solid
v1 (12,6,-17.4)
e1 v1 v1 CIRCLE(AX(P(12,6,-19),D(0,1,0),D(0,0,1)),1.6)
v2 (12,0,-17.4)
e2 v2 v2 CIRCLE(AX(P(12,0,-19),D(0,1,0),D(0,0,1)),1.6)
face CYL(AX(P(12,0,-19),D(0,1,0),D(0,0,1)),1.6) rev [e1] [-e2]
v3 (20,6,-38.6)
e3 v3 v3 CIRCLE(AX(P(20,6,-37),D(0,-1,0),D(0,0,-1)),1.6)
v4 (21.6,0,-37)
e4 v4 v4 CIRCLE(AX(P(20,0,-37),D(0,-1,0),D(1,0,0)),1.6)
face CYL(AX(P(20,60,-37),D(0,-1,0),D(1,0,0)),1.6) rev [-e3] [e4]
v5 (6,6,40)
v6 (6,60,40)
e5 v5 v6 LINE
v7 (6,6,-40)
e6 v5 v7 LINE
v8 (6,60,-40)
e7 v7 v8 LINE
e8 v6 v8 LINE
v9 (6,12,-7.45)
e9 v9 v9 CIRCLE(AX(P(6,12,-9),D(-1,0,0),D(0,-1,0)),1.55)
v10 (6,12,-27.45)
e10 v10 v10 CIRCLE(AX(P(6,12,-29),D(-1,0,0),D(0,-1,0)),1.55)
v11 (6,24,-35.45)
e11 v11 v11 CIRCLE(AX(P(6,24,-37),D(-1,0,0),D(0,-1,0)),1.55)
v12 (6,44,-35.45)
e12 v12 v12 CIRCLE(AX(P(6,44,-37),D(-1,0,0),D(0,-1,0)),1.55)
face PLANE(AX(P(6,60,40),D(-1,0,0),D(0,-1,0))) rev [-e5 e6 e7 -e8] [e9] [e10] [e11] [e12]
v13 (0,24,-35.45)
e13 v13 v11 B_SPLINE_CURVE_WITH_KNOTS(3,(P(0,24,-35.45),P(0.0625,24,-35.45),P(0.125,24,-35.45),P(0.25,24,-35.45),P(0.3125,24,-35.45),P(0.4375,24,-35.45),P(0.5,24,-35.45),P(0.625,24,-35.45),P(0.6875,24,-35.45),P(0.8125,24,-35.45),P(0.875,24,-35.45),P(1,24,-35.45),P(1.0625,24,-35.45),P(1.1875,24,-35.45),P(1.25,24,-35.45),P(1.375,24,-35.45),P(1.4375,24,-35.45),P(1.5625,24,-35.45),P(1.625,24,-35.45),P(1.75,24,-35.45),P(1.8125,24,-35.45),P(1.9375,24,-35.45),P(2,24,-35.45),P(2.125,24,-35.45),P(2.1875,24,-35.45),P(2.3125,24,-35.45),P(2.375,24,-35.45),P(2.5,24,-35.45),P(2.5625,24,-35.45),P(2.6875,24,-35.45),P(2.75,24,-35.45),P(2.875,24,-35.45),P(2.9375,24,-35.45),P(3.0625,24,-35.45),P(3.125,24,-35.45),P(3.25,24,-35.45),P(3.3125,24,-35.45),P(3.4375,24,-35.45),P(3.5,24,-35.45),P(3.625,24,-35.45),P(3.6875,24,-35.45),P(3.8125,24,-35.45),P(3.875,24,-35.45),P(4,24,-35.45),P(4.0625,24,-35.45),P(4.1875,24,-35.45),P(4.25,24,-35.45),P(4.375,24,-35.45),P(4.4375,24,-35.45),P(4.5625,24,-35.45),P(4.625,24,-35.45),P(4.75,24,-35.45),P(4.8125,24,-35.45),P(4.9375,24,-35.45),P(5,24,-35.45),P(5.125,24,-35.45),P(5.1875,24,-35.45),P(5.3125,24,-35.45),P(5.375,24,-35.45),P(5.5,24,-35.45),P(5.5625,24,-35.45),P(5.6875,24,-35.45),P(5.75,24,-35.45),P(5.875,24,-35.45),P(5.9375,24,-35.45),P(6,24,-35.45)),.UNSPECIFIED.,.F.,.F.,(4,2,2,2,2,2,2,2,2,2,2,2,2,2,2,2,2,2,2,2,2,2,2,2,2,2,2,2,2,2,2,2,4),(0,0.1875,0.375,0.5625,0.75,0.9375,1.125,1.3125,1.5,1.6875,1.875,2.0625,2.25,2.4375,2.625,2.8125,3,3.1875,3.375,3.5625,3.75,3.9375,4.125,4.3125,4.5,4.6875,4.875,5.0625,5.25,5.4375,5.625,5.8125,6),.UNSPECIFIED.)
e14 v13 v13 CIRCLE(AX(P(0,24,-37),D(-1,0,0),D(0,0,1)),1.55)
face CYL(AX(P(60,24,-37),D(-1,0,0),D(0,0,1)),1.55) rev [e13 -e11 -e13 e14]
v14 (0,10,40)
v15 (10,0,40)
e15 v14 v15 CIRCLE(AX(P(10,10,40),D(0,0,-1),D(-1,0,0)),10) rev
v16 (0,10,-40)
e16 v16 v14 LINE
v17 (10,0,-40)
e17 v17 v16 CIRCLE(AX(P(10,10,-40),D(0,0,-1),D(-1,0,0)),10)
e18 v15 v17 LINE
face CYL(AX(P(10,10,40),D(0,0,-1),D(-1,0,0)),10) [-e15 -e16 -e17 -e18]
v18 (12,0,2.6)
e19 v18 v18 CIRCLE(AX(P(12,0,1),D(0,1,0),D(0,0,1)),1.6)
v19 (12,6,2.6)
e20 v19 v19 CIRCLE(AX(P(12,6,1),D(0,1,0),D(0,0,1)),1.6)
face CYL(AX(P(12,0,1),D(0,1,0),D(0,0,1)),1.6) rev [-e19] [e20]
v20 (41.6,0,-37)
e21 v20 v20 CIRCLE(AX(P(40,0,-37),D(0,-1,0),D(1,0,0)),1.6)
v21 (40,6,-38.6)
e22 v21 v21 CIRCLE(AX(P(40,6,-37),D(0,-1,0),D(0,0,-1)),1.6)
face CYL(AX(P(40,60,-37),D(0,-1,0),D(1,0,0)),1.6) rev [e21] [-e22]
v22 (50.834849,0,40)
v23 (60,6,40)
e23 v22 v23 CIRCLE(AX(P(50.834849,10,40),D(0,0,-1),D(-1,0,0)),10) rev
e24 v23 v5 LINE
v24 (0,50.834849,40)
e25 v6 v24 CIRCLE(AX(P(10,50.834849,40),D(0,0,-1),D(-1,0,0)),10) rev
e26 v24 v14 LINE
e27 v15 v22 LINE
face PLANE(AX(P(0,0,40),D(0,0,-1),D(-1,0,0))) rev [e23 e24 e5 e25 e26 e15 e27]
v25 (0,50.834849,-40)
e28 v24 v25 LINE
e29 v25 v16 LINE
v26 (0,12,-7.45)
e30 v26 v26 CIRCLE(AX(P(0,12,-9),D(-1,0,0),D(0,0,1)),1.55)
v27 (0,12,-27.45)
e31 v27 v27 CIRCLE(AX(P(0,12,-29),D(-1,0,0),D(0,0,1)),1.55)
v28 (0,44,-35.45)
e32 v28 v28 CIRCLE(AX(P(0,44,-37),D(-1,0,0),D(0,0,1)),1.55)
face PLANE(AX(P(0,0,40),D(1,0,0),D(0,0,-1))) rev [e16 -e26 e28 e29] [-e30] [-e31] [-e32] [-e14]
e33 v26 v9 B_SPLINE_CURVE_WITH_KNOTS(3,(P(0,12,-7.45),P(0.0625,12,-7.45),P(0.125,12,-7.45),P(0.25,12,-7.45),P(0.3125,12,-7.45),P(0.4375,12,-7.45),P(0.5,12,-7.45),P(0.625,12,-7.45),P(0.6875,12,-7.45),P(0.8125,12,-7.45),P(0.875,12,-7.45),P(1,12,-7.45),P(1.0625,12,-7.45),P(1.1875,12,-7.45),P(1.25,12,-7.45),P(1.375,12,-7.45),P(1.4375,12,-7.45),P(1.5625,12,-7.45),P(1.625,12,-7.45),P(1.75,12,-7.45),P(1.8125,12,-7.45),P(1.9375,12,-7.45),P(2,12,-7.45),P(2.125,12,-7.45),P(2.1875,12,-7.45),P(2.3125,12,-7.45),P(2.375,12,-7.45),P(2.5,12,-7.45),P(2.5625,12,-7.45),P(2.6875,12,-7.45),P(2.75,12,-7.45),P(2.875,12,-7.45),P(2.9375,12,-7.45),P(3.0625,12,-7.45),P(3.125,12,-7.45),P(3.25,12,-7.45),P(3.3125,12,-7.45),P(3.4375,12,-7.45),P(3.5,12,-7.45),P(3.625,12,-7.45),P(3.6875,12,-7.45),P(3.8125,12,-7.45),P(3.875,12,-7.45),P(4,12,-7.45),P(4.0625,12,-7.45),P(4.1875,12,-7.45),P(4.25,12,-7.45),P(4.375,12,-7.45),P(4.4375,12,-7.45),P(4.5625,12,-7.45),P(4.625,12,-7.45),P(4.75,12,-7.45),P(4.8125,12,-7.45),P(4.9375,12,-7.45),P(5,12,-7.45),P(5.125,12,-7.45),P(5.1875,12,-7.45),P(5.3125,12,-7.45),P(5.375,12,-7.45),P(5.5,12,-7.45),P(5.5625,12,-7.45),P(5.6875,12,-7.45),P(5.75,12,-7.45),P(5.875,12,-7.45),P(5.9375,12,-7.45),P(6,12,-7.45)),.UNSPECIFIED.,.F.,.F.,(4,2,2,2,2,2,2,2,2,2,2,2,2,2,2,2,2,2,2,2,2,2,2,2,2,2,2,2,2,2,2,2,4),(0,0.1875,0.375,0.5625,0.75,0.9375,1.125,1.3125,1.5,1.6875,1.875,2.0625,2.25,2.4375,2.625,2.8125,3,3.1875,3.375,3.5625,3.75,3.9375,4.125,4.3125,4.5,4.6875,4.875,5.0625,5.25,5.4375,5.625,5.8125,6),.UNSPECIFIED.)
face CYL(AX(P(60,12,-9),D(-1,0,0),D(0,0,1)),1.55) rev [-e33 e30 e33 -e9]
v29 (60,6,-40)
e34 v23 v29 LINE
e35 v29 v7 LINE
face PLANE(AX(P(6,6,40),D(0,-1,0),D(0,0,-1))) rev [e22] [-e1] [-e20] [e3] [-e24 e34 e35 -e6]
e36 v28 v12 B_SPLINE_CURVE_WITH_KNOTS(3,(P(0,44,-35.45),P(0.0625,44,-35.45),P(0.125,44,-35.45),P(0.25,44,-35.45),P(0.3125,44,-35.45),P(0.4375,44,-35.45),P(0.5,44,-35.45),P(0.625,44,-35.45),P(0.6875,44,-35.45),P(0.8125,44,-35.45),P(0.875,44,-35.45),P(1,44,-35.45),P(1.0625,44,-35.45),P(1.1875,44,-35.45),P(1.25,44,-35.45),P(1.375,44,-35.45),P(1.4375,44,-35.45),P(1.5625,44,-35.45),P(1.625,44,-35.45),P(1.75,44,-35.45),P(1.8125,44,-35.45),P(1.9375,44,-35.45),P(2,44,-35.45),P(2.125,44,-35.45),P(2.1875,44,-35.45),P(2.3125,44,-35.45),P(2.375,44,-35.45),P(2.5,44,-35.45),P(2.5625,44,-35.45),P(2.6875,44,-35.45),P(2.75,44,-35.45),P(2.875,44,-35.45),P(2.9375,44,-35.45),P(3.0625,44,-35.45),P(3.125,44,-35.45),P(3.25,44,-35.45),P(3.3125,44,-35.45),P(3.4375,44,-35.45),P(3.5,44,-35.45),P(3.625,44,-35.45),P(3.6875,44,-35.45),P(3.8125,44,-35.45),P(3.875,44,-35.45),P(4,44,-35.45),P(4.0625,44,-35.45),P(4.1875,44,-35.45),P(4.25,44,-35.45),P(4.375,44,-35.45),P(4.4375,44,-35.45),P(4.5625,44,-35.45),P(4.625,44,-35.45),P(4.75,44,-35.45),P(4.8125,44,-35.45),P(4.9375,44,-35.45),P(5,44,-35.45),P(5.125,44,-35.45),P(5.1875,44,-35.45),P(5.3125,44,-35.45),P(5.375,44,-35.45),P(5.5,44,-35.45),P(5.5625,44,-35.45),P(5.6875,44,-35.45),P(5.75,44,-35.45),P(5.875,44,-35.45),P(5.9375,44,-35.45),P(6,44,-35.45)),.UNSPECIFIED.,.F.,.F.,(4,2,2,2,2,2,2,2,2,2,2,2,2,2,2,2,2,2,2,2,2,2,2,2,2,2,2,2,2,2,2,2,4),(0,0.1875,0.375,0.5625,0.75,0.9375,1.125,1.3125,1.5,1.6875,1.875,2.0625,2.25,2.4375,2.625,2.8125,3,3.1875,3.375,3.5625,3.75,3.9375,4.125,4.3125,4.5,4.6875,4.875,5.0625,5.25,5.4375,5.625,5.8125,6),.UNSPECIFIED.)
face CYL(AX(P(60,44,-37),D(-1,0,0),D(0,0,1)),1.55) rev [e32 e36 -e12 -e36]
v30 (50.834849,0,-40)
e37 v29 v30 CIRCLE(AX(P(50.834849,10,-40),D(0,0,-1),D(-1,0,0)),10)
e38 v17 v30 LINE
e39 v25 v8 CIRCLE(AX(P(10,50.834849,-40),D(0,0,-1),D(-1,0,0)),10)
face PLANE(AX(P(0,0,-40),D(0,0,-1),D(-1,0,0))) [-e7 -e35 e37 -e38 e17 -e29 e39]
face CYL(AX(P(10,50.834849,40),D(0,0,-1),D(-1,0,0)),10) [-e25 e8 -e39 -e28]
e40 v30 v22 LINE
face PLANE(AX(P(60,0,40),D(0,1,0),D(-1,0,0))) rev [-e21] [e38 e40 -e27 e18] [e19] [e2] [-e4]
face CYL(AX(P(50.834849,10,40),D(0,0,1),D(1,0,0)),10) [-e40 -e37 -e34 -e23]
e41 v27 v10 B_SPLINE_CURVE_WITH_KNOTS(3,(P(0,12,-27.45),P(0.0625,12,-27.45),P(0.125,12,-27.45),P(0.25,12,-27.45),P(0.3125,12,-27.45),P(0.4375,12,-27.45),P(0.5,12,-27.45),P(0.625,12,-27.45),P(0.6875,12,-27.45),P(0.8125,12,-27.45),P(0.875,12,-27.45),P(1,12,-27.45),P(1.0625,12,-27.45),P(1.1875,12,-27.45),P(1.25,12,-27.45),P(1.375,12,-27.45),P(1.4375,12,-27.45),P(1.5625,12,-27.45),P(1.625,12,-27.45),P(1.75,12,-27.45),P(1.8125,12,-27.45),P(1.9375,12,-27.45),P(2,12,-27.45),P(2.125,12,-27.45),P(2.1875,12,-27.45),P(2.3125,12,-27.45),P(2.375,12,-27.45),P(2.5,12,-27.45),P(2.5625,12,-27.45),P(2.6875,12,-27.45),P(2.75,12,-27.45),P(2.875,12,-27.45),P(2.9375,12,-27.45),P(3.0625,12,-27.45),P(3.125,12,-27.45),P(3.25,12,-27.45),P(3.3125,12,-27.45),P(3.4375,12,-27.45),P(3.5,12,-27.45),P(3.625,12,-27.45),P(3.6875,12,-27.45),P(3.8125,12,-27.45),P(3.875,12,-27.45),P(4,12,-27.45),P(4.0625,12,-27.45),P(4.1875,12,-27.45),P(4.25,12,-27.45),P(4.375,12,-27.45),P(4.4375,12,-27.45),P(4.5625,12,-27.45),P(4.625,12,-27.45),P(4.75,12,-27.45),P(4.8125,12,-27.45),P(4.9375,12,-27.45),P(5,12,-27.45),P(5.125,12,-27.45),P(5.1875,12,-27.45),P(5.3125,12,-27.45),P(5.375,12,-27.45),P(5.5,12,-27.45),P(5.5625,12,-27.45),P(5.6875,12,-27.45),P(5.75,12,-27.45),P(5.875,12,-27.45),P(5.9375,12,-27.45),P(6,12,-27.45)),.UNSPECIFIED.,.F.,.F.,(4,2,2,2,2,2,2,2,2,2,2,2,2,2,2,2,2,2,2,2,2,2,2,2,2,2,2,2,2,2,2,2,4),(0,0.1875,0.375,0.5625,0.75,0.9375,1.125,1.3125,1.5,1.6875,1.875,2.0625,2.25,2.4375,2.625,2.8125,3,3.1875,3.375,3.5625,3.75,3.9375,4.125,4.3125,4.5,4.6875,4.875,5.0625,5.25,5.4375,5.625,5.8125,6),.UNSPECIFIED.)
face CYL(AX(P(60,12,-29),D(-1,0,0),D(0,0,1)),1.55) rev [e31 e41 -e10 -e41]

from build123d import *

# Parameters (mm, degrees)
EXTRUDE_1_DEPTH     = 40
FILLET_1_R          = 10
SKETCH_3_R          = 1.55
CUT_EXTRUDE_1_DEPTH = 94.808315196
SKETCH_4_R          = 1.6
CUT_EXTRUDE_2_DEPTH = 91.088845036
SKETCH_5_R          = 1.6
CUT_EXTRUDE_3_DEPTH = 94.808315196


with BuildPart() as part:
    # 草图1 → 凸台-拉伸1 (new, symmetric)
    with BuildSketch(Plane.XY):
        Polygon((0, 0), (0, 60), (6, 60), (6, 6), (60, 6), (60, 0), align=None)
    extrude(amount=EXTRUDE_1_DEPTH, both=True)

    # 圆角1
    # the kernel refuses this fillet: 10 mm, written as the material it takes off along each edge
    with BuildSketch(Plane(origin=(0, 60, 62.912878475), x_dir=(0, -1, 0), z_dir=(0, 0, -1))) as fillet_1_piece_1:
        with BuildLine():
            CenterArc((9.16515139, -10), FILLET_1_R, 90, 66.421821522)
            Line((0, -6), (-0.183303028, -5.92))
            ThreePointArc((-0.183303028, -5.92), (-0.2, -3), (-0.2, 0))
            Line((-0.2, 0), (0, 0.2))
            Line((0, 0.2), (9.16515139, 0.2))
            Line((9.16515139, 0.2), (9.16515139, 0))
        make_face()
    extrude(amount=125.82575695, mode=Mode.SUBTRACT)
    with BuildSketch(Plane(origin=(60, 0, -62.912878475), x_dir=(0, 1, 0), z_dir=(0, 0, 1))) as fillet_1_piece_2:
        with BuildLine():
            CenterArc((10, 9.16515139), FILLET_1_R, 180, 66.421821522)
            Line((0, 9.16515139), (-0.2, 9.16515139))
            Line((-0.2, 9.16515139), (-0.2, 0))
            Line((-0.2, 0), (0, -0.2))
            ThreePointArc((0, -0.2), (3, -0.2), (5.92, -0.183303028))
            Line((5.92, -0.183303028), (6, 0))
        make_face()
    extrude(amount=125.82575695, mode=Mode.SUBTRACT)
    with BuildSketch(Plane(origin=(0, 0, -65), x_dir=(0, 1, 0), z_dir=(0, 0, 1))) as fillet_1_piece_3:
        with BuildLine():
            CenterArc((FILLET_1_R, -FILLET_1_R), FILLET_1_R, 90, 90)
            Line((0, -FILLET_1_R), (-FILLET_1_R * 0.02, -FILLET_1_R))
            Line((-FILLET_1_R * 0.02, -FILLET_1_R), (-FILLET_1_R * 0.02, FILLET_1_R * 0.02))
            Line((-FILLET_1_R * 0.02, FILLET_1_R * 0.02), (FILLET_1_R, FILLET_1_R * 0.02))
            Line((FILLET_1_R, FILLET_1_R * 0.02), (FILLET_1_R, 0))
        make_face()
    extrude(amount=130, mode=Mode.SUBTRACT)

    # 草图3 → 切除-拉伸1 (cut, through all)
    with BuildSketch(Plane.ZY):
        with Locations((-37, 44)):
            Circle(SKETCH_3_R)
        with Locations((-37, 24)):
            Circle(SKETCH_3_R)
        with Locations((-29, 12)):
            Circle(SKETCH_3_R)
        with Locations((-9, 12)):
            Circle(SKETCH_3_R)
    extrude(amount=-CUT_EXTRUDE_1_DEPTH, mode=Mode.SUBTRACT)

    # 草图4 → 切除-拉伸2 (cut, through all)
    with BuildSketch(Plane(origin=(0, 6, 0), x_dir=(1, 0, 0), z_dir=(0, 1, 0))):
        with Locations(Location((12, -1, 0), (0, 0, 270))):
            Circle(SKETCH_4_R)
        with Locations(Location((12, 19, 0), (0, 0, 270))):
            Circle(SKETCH_4_R)
    extrude(amount=-CUT_EXTRUDE_2_DEPTH, mode=Mode.SUBTRACT)

    # 草图5 → 切除-拉伸3 (cut, through all)
    with BuildSketch(Plane.XZ):
        with Locations((20, -37)):
            Circle(SKETCH_5_R)
        with Locations((40, -37)):
            Circle(SKETCH_5_R)
    extrude(amount=-CUT_EXTRUDE_3_DEPTH, mode=Mode.SUBTRACT)


solid = part.part
